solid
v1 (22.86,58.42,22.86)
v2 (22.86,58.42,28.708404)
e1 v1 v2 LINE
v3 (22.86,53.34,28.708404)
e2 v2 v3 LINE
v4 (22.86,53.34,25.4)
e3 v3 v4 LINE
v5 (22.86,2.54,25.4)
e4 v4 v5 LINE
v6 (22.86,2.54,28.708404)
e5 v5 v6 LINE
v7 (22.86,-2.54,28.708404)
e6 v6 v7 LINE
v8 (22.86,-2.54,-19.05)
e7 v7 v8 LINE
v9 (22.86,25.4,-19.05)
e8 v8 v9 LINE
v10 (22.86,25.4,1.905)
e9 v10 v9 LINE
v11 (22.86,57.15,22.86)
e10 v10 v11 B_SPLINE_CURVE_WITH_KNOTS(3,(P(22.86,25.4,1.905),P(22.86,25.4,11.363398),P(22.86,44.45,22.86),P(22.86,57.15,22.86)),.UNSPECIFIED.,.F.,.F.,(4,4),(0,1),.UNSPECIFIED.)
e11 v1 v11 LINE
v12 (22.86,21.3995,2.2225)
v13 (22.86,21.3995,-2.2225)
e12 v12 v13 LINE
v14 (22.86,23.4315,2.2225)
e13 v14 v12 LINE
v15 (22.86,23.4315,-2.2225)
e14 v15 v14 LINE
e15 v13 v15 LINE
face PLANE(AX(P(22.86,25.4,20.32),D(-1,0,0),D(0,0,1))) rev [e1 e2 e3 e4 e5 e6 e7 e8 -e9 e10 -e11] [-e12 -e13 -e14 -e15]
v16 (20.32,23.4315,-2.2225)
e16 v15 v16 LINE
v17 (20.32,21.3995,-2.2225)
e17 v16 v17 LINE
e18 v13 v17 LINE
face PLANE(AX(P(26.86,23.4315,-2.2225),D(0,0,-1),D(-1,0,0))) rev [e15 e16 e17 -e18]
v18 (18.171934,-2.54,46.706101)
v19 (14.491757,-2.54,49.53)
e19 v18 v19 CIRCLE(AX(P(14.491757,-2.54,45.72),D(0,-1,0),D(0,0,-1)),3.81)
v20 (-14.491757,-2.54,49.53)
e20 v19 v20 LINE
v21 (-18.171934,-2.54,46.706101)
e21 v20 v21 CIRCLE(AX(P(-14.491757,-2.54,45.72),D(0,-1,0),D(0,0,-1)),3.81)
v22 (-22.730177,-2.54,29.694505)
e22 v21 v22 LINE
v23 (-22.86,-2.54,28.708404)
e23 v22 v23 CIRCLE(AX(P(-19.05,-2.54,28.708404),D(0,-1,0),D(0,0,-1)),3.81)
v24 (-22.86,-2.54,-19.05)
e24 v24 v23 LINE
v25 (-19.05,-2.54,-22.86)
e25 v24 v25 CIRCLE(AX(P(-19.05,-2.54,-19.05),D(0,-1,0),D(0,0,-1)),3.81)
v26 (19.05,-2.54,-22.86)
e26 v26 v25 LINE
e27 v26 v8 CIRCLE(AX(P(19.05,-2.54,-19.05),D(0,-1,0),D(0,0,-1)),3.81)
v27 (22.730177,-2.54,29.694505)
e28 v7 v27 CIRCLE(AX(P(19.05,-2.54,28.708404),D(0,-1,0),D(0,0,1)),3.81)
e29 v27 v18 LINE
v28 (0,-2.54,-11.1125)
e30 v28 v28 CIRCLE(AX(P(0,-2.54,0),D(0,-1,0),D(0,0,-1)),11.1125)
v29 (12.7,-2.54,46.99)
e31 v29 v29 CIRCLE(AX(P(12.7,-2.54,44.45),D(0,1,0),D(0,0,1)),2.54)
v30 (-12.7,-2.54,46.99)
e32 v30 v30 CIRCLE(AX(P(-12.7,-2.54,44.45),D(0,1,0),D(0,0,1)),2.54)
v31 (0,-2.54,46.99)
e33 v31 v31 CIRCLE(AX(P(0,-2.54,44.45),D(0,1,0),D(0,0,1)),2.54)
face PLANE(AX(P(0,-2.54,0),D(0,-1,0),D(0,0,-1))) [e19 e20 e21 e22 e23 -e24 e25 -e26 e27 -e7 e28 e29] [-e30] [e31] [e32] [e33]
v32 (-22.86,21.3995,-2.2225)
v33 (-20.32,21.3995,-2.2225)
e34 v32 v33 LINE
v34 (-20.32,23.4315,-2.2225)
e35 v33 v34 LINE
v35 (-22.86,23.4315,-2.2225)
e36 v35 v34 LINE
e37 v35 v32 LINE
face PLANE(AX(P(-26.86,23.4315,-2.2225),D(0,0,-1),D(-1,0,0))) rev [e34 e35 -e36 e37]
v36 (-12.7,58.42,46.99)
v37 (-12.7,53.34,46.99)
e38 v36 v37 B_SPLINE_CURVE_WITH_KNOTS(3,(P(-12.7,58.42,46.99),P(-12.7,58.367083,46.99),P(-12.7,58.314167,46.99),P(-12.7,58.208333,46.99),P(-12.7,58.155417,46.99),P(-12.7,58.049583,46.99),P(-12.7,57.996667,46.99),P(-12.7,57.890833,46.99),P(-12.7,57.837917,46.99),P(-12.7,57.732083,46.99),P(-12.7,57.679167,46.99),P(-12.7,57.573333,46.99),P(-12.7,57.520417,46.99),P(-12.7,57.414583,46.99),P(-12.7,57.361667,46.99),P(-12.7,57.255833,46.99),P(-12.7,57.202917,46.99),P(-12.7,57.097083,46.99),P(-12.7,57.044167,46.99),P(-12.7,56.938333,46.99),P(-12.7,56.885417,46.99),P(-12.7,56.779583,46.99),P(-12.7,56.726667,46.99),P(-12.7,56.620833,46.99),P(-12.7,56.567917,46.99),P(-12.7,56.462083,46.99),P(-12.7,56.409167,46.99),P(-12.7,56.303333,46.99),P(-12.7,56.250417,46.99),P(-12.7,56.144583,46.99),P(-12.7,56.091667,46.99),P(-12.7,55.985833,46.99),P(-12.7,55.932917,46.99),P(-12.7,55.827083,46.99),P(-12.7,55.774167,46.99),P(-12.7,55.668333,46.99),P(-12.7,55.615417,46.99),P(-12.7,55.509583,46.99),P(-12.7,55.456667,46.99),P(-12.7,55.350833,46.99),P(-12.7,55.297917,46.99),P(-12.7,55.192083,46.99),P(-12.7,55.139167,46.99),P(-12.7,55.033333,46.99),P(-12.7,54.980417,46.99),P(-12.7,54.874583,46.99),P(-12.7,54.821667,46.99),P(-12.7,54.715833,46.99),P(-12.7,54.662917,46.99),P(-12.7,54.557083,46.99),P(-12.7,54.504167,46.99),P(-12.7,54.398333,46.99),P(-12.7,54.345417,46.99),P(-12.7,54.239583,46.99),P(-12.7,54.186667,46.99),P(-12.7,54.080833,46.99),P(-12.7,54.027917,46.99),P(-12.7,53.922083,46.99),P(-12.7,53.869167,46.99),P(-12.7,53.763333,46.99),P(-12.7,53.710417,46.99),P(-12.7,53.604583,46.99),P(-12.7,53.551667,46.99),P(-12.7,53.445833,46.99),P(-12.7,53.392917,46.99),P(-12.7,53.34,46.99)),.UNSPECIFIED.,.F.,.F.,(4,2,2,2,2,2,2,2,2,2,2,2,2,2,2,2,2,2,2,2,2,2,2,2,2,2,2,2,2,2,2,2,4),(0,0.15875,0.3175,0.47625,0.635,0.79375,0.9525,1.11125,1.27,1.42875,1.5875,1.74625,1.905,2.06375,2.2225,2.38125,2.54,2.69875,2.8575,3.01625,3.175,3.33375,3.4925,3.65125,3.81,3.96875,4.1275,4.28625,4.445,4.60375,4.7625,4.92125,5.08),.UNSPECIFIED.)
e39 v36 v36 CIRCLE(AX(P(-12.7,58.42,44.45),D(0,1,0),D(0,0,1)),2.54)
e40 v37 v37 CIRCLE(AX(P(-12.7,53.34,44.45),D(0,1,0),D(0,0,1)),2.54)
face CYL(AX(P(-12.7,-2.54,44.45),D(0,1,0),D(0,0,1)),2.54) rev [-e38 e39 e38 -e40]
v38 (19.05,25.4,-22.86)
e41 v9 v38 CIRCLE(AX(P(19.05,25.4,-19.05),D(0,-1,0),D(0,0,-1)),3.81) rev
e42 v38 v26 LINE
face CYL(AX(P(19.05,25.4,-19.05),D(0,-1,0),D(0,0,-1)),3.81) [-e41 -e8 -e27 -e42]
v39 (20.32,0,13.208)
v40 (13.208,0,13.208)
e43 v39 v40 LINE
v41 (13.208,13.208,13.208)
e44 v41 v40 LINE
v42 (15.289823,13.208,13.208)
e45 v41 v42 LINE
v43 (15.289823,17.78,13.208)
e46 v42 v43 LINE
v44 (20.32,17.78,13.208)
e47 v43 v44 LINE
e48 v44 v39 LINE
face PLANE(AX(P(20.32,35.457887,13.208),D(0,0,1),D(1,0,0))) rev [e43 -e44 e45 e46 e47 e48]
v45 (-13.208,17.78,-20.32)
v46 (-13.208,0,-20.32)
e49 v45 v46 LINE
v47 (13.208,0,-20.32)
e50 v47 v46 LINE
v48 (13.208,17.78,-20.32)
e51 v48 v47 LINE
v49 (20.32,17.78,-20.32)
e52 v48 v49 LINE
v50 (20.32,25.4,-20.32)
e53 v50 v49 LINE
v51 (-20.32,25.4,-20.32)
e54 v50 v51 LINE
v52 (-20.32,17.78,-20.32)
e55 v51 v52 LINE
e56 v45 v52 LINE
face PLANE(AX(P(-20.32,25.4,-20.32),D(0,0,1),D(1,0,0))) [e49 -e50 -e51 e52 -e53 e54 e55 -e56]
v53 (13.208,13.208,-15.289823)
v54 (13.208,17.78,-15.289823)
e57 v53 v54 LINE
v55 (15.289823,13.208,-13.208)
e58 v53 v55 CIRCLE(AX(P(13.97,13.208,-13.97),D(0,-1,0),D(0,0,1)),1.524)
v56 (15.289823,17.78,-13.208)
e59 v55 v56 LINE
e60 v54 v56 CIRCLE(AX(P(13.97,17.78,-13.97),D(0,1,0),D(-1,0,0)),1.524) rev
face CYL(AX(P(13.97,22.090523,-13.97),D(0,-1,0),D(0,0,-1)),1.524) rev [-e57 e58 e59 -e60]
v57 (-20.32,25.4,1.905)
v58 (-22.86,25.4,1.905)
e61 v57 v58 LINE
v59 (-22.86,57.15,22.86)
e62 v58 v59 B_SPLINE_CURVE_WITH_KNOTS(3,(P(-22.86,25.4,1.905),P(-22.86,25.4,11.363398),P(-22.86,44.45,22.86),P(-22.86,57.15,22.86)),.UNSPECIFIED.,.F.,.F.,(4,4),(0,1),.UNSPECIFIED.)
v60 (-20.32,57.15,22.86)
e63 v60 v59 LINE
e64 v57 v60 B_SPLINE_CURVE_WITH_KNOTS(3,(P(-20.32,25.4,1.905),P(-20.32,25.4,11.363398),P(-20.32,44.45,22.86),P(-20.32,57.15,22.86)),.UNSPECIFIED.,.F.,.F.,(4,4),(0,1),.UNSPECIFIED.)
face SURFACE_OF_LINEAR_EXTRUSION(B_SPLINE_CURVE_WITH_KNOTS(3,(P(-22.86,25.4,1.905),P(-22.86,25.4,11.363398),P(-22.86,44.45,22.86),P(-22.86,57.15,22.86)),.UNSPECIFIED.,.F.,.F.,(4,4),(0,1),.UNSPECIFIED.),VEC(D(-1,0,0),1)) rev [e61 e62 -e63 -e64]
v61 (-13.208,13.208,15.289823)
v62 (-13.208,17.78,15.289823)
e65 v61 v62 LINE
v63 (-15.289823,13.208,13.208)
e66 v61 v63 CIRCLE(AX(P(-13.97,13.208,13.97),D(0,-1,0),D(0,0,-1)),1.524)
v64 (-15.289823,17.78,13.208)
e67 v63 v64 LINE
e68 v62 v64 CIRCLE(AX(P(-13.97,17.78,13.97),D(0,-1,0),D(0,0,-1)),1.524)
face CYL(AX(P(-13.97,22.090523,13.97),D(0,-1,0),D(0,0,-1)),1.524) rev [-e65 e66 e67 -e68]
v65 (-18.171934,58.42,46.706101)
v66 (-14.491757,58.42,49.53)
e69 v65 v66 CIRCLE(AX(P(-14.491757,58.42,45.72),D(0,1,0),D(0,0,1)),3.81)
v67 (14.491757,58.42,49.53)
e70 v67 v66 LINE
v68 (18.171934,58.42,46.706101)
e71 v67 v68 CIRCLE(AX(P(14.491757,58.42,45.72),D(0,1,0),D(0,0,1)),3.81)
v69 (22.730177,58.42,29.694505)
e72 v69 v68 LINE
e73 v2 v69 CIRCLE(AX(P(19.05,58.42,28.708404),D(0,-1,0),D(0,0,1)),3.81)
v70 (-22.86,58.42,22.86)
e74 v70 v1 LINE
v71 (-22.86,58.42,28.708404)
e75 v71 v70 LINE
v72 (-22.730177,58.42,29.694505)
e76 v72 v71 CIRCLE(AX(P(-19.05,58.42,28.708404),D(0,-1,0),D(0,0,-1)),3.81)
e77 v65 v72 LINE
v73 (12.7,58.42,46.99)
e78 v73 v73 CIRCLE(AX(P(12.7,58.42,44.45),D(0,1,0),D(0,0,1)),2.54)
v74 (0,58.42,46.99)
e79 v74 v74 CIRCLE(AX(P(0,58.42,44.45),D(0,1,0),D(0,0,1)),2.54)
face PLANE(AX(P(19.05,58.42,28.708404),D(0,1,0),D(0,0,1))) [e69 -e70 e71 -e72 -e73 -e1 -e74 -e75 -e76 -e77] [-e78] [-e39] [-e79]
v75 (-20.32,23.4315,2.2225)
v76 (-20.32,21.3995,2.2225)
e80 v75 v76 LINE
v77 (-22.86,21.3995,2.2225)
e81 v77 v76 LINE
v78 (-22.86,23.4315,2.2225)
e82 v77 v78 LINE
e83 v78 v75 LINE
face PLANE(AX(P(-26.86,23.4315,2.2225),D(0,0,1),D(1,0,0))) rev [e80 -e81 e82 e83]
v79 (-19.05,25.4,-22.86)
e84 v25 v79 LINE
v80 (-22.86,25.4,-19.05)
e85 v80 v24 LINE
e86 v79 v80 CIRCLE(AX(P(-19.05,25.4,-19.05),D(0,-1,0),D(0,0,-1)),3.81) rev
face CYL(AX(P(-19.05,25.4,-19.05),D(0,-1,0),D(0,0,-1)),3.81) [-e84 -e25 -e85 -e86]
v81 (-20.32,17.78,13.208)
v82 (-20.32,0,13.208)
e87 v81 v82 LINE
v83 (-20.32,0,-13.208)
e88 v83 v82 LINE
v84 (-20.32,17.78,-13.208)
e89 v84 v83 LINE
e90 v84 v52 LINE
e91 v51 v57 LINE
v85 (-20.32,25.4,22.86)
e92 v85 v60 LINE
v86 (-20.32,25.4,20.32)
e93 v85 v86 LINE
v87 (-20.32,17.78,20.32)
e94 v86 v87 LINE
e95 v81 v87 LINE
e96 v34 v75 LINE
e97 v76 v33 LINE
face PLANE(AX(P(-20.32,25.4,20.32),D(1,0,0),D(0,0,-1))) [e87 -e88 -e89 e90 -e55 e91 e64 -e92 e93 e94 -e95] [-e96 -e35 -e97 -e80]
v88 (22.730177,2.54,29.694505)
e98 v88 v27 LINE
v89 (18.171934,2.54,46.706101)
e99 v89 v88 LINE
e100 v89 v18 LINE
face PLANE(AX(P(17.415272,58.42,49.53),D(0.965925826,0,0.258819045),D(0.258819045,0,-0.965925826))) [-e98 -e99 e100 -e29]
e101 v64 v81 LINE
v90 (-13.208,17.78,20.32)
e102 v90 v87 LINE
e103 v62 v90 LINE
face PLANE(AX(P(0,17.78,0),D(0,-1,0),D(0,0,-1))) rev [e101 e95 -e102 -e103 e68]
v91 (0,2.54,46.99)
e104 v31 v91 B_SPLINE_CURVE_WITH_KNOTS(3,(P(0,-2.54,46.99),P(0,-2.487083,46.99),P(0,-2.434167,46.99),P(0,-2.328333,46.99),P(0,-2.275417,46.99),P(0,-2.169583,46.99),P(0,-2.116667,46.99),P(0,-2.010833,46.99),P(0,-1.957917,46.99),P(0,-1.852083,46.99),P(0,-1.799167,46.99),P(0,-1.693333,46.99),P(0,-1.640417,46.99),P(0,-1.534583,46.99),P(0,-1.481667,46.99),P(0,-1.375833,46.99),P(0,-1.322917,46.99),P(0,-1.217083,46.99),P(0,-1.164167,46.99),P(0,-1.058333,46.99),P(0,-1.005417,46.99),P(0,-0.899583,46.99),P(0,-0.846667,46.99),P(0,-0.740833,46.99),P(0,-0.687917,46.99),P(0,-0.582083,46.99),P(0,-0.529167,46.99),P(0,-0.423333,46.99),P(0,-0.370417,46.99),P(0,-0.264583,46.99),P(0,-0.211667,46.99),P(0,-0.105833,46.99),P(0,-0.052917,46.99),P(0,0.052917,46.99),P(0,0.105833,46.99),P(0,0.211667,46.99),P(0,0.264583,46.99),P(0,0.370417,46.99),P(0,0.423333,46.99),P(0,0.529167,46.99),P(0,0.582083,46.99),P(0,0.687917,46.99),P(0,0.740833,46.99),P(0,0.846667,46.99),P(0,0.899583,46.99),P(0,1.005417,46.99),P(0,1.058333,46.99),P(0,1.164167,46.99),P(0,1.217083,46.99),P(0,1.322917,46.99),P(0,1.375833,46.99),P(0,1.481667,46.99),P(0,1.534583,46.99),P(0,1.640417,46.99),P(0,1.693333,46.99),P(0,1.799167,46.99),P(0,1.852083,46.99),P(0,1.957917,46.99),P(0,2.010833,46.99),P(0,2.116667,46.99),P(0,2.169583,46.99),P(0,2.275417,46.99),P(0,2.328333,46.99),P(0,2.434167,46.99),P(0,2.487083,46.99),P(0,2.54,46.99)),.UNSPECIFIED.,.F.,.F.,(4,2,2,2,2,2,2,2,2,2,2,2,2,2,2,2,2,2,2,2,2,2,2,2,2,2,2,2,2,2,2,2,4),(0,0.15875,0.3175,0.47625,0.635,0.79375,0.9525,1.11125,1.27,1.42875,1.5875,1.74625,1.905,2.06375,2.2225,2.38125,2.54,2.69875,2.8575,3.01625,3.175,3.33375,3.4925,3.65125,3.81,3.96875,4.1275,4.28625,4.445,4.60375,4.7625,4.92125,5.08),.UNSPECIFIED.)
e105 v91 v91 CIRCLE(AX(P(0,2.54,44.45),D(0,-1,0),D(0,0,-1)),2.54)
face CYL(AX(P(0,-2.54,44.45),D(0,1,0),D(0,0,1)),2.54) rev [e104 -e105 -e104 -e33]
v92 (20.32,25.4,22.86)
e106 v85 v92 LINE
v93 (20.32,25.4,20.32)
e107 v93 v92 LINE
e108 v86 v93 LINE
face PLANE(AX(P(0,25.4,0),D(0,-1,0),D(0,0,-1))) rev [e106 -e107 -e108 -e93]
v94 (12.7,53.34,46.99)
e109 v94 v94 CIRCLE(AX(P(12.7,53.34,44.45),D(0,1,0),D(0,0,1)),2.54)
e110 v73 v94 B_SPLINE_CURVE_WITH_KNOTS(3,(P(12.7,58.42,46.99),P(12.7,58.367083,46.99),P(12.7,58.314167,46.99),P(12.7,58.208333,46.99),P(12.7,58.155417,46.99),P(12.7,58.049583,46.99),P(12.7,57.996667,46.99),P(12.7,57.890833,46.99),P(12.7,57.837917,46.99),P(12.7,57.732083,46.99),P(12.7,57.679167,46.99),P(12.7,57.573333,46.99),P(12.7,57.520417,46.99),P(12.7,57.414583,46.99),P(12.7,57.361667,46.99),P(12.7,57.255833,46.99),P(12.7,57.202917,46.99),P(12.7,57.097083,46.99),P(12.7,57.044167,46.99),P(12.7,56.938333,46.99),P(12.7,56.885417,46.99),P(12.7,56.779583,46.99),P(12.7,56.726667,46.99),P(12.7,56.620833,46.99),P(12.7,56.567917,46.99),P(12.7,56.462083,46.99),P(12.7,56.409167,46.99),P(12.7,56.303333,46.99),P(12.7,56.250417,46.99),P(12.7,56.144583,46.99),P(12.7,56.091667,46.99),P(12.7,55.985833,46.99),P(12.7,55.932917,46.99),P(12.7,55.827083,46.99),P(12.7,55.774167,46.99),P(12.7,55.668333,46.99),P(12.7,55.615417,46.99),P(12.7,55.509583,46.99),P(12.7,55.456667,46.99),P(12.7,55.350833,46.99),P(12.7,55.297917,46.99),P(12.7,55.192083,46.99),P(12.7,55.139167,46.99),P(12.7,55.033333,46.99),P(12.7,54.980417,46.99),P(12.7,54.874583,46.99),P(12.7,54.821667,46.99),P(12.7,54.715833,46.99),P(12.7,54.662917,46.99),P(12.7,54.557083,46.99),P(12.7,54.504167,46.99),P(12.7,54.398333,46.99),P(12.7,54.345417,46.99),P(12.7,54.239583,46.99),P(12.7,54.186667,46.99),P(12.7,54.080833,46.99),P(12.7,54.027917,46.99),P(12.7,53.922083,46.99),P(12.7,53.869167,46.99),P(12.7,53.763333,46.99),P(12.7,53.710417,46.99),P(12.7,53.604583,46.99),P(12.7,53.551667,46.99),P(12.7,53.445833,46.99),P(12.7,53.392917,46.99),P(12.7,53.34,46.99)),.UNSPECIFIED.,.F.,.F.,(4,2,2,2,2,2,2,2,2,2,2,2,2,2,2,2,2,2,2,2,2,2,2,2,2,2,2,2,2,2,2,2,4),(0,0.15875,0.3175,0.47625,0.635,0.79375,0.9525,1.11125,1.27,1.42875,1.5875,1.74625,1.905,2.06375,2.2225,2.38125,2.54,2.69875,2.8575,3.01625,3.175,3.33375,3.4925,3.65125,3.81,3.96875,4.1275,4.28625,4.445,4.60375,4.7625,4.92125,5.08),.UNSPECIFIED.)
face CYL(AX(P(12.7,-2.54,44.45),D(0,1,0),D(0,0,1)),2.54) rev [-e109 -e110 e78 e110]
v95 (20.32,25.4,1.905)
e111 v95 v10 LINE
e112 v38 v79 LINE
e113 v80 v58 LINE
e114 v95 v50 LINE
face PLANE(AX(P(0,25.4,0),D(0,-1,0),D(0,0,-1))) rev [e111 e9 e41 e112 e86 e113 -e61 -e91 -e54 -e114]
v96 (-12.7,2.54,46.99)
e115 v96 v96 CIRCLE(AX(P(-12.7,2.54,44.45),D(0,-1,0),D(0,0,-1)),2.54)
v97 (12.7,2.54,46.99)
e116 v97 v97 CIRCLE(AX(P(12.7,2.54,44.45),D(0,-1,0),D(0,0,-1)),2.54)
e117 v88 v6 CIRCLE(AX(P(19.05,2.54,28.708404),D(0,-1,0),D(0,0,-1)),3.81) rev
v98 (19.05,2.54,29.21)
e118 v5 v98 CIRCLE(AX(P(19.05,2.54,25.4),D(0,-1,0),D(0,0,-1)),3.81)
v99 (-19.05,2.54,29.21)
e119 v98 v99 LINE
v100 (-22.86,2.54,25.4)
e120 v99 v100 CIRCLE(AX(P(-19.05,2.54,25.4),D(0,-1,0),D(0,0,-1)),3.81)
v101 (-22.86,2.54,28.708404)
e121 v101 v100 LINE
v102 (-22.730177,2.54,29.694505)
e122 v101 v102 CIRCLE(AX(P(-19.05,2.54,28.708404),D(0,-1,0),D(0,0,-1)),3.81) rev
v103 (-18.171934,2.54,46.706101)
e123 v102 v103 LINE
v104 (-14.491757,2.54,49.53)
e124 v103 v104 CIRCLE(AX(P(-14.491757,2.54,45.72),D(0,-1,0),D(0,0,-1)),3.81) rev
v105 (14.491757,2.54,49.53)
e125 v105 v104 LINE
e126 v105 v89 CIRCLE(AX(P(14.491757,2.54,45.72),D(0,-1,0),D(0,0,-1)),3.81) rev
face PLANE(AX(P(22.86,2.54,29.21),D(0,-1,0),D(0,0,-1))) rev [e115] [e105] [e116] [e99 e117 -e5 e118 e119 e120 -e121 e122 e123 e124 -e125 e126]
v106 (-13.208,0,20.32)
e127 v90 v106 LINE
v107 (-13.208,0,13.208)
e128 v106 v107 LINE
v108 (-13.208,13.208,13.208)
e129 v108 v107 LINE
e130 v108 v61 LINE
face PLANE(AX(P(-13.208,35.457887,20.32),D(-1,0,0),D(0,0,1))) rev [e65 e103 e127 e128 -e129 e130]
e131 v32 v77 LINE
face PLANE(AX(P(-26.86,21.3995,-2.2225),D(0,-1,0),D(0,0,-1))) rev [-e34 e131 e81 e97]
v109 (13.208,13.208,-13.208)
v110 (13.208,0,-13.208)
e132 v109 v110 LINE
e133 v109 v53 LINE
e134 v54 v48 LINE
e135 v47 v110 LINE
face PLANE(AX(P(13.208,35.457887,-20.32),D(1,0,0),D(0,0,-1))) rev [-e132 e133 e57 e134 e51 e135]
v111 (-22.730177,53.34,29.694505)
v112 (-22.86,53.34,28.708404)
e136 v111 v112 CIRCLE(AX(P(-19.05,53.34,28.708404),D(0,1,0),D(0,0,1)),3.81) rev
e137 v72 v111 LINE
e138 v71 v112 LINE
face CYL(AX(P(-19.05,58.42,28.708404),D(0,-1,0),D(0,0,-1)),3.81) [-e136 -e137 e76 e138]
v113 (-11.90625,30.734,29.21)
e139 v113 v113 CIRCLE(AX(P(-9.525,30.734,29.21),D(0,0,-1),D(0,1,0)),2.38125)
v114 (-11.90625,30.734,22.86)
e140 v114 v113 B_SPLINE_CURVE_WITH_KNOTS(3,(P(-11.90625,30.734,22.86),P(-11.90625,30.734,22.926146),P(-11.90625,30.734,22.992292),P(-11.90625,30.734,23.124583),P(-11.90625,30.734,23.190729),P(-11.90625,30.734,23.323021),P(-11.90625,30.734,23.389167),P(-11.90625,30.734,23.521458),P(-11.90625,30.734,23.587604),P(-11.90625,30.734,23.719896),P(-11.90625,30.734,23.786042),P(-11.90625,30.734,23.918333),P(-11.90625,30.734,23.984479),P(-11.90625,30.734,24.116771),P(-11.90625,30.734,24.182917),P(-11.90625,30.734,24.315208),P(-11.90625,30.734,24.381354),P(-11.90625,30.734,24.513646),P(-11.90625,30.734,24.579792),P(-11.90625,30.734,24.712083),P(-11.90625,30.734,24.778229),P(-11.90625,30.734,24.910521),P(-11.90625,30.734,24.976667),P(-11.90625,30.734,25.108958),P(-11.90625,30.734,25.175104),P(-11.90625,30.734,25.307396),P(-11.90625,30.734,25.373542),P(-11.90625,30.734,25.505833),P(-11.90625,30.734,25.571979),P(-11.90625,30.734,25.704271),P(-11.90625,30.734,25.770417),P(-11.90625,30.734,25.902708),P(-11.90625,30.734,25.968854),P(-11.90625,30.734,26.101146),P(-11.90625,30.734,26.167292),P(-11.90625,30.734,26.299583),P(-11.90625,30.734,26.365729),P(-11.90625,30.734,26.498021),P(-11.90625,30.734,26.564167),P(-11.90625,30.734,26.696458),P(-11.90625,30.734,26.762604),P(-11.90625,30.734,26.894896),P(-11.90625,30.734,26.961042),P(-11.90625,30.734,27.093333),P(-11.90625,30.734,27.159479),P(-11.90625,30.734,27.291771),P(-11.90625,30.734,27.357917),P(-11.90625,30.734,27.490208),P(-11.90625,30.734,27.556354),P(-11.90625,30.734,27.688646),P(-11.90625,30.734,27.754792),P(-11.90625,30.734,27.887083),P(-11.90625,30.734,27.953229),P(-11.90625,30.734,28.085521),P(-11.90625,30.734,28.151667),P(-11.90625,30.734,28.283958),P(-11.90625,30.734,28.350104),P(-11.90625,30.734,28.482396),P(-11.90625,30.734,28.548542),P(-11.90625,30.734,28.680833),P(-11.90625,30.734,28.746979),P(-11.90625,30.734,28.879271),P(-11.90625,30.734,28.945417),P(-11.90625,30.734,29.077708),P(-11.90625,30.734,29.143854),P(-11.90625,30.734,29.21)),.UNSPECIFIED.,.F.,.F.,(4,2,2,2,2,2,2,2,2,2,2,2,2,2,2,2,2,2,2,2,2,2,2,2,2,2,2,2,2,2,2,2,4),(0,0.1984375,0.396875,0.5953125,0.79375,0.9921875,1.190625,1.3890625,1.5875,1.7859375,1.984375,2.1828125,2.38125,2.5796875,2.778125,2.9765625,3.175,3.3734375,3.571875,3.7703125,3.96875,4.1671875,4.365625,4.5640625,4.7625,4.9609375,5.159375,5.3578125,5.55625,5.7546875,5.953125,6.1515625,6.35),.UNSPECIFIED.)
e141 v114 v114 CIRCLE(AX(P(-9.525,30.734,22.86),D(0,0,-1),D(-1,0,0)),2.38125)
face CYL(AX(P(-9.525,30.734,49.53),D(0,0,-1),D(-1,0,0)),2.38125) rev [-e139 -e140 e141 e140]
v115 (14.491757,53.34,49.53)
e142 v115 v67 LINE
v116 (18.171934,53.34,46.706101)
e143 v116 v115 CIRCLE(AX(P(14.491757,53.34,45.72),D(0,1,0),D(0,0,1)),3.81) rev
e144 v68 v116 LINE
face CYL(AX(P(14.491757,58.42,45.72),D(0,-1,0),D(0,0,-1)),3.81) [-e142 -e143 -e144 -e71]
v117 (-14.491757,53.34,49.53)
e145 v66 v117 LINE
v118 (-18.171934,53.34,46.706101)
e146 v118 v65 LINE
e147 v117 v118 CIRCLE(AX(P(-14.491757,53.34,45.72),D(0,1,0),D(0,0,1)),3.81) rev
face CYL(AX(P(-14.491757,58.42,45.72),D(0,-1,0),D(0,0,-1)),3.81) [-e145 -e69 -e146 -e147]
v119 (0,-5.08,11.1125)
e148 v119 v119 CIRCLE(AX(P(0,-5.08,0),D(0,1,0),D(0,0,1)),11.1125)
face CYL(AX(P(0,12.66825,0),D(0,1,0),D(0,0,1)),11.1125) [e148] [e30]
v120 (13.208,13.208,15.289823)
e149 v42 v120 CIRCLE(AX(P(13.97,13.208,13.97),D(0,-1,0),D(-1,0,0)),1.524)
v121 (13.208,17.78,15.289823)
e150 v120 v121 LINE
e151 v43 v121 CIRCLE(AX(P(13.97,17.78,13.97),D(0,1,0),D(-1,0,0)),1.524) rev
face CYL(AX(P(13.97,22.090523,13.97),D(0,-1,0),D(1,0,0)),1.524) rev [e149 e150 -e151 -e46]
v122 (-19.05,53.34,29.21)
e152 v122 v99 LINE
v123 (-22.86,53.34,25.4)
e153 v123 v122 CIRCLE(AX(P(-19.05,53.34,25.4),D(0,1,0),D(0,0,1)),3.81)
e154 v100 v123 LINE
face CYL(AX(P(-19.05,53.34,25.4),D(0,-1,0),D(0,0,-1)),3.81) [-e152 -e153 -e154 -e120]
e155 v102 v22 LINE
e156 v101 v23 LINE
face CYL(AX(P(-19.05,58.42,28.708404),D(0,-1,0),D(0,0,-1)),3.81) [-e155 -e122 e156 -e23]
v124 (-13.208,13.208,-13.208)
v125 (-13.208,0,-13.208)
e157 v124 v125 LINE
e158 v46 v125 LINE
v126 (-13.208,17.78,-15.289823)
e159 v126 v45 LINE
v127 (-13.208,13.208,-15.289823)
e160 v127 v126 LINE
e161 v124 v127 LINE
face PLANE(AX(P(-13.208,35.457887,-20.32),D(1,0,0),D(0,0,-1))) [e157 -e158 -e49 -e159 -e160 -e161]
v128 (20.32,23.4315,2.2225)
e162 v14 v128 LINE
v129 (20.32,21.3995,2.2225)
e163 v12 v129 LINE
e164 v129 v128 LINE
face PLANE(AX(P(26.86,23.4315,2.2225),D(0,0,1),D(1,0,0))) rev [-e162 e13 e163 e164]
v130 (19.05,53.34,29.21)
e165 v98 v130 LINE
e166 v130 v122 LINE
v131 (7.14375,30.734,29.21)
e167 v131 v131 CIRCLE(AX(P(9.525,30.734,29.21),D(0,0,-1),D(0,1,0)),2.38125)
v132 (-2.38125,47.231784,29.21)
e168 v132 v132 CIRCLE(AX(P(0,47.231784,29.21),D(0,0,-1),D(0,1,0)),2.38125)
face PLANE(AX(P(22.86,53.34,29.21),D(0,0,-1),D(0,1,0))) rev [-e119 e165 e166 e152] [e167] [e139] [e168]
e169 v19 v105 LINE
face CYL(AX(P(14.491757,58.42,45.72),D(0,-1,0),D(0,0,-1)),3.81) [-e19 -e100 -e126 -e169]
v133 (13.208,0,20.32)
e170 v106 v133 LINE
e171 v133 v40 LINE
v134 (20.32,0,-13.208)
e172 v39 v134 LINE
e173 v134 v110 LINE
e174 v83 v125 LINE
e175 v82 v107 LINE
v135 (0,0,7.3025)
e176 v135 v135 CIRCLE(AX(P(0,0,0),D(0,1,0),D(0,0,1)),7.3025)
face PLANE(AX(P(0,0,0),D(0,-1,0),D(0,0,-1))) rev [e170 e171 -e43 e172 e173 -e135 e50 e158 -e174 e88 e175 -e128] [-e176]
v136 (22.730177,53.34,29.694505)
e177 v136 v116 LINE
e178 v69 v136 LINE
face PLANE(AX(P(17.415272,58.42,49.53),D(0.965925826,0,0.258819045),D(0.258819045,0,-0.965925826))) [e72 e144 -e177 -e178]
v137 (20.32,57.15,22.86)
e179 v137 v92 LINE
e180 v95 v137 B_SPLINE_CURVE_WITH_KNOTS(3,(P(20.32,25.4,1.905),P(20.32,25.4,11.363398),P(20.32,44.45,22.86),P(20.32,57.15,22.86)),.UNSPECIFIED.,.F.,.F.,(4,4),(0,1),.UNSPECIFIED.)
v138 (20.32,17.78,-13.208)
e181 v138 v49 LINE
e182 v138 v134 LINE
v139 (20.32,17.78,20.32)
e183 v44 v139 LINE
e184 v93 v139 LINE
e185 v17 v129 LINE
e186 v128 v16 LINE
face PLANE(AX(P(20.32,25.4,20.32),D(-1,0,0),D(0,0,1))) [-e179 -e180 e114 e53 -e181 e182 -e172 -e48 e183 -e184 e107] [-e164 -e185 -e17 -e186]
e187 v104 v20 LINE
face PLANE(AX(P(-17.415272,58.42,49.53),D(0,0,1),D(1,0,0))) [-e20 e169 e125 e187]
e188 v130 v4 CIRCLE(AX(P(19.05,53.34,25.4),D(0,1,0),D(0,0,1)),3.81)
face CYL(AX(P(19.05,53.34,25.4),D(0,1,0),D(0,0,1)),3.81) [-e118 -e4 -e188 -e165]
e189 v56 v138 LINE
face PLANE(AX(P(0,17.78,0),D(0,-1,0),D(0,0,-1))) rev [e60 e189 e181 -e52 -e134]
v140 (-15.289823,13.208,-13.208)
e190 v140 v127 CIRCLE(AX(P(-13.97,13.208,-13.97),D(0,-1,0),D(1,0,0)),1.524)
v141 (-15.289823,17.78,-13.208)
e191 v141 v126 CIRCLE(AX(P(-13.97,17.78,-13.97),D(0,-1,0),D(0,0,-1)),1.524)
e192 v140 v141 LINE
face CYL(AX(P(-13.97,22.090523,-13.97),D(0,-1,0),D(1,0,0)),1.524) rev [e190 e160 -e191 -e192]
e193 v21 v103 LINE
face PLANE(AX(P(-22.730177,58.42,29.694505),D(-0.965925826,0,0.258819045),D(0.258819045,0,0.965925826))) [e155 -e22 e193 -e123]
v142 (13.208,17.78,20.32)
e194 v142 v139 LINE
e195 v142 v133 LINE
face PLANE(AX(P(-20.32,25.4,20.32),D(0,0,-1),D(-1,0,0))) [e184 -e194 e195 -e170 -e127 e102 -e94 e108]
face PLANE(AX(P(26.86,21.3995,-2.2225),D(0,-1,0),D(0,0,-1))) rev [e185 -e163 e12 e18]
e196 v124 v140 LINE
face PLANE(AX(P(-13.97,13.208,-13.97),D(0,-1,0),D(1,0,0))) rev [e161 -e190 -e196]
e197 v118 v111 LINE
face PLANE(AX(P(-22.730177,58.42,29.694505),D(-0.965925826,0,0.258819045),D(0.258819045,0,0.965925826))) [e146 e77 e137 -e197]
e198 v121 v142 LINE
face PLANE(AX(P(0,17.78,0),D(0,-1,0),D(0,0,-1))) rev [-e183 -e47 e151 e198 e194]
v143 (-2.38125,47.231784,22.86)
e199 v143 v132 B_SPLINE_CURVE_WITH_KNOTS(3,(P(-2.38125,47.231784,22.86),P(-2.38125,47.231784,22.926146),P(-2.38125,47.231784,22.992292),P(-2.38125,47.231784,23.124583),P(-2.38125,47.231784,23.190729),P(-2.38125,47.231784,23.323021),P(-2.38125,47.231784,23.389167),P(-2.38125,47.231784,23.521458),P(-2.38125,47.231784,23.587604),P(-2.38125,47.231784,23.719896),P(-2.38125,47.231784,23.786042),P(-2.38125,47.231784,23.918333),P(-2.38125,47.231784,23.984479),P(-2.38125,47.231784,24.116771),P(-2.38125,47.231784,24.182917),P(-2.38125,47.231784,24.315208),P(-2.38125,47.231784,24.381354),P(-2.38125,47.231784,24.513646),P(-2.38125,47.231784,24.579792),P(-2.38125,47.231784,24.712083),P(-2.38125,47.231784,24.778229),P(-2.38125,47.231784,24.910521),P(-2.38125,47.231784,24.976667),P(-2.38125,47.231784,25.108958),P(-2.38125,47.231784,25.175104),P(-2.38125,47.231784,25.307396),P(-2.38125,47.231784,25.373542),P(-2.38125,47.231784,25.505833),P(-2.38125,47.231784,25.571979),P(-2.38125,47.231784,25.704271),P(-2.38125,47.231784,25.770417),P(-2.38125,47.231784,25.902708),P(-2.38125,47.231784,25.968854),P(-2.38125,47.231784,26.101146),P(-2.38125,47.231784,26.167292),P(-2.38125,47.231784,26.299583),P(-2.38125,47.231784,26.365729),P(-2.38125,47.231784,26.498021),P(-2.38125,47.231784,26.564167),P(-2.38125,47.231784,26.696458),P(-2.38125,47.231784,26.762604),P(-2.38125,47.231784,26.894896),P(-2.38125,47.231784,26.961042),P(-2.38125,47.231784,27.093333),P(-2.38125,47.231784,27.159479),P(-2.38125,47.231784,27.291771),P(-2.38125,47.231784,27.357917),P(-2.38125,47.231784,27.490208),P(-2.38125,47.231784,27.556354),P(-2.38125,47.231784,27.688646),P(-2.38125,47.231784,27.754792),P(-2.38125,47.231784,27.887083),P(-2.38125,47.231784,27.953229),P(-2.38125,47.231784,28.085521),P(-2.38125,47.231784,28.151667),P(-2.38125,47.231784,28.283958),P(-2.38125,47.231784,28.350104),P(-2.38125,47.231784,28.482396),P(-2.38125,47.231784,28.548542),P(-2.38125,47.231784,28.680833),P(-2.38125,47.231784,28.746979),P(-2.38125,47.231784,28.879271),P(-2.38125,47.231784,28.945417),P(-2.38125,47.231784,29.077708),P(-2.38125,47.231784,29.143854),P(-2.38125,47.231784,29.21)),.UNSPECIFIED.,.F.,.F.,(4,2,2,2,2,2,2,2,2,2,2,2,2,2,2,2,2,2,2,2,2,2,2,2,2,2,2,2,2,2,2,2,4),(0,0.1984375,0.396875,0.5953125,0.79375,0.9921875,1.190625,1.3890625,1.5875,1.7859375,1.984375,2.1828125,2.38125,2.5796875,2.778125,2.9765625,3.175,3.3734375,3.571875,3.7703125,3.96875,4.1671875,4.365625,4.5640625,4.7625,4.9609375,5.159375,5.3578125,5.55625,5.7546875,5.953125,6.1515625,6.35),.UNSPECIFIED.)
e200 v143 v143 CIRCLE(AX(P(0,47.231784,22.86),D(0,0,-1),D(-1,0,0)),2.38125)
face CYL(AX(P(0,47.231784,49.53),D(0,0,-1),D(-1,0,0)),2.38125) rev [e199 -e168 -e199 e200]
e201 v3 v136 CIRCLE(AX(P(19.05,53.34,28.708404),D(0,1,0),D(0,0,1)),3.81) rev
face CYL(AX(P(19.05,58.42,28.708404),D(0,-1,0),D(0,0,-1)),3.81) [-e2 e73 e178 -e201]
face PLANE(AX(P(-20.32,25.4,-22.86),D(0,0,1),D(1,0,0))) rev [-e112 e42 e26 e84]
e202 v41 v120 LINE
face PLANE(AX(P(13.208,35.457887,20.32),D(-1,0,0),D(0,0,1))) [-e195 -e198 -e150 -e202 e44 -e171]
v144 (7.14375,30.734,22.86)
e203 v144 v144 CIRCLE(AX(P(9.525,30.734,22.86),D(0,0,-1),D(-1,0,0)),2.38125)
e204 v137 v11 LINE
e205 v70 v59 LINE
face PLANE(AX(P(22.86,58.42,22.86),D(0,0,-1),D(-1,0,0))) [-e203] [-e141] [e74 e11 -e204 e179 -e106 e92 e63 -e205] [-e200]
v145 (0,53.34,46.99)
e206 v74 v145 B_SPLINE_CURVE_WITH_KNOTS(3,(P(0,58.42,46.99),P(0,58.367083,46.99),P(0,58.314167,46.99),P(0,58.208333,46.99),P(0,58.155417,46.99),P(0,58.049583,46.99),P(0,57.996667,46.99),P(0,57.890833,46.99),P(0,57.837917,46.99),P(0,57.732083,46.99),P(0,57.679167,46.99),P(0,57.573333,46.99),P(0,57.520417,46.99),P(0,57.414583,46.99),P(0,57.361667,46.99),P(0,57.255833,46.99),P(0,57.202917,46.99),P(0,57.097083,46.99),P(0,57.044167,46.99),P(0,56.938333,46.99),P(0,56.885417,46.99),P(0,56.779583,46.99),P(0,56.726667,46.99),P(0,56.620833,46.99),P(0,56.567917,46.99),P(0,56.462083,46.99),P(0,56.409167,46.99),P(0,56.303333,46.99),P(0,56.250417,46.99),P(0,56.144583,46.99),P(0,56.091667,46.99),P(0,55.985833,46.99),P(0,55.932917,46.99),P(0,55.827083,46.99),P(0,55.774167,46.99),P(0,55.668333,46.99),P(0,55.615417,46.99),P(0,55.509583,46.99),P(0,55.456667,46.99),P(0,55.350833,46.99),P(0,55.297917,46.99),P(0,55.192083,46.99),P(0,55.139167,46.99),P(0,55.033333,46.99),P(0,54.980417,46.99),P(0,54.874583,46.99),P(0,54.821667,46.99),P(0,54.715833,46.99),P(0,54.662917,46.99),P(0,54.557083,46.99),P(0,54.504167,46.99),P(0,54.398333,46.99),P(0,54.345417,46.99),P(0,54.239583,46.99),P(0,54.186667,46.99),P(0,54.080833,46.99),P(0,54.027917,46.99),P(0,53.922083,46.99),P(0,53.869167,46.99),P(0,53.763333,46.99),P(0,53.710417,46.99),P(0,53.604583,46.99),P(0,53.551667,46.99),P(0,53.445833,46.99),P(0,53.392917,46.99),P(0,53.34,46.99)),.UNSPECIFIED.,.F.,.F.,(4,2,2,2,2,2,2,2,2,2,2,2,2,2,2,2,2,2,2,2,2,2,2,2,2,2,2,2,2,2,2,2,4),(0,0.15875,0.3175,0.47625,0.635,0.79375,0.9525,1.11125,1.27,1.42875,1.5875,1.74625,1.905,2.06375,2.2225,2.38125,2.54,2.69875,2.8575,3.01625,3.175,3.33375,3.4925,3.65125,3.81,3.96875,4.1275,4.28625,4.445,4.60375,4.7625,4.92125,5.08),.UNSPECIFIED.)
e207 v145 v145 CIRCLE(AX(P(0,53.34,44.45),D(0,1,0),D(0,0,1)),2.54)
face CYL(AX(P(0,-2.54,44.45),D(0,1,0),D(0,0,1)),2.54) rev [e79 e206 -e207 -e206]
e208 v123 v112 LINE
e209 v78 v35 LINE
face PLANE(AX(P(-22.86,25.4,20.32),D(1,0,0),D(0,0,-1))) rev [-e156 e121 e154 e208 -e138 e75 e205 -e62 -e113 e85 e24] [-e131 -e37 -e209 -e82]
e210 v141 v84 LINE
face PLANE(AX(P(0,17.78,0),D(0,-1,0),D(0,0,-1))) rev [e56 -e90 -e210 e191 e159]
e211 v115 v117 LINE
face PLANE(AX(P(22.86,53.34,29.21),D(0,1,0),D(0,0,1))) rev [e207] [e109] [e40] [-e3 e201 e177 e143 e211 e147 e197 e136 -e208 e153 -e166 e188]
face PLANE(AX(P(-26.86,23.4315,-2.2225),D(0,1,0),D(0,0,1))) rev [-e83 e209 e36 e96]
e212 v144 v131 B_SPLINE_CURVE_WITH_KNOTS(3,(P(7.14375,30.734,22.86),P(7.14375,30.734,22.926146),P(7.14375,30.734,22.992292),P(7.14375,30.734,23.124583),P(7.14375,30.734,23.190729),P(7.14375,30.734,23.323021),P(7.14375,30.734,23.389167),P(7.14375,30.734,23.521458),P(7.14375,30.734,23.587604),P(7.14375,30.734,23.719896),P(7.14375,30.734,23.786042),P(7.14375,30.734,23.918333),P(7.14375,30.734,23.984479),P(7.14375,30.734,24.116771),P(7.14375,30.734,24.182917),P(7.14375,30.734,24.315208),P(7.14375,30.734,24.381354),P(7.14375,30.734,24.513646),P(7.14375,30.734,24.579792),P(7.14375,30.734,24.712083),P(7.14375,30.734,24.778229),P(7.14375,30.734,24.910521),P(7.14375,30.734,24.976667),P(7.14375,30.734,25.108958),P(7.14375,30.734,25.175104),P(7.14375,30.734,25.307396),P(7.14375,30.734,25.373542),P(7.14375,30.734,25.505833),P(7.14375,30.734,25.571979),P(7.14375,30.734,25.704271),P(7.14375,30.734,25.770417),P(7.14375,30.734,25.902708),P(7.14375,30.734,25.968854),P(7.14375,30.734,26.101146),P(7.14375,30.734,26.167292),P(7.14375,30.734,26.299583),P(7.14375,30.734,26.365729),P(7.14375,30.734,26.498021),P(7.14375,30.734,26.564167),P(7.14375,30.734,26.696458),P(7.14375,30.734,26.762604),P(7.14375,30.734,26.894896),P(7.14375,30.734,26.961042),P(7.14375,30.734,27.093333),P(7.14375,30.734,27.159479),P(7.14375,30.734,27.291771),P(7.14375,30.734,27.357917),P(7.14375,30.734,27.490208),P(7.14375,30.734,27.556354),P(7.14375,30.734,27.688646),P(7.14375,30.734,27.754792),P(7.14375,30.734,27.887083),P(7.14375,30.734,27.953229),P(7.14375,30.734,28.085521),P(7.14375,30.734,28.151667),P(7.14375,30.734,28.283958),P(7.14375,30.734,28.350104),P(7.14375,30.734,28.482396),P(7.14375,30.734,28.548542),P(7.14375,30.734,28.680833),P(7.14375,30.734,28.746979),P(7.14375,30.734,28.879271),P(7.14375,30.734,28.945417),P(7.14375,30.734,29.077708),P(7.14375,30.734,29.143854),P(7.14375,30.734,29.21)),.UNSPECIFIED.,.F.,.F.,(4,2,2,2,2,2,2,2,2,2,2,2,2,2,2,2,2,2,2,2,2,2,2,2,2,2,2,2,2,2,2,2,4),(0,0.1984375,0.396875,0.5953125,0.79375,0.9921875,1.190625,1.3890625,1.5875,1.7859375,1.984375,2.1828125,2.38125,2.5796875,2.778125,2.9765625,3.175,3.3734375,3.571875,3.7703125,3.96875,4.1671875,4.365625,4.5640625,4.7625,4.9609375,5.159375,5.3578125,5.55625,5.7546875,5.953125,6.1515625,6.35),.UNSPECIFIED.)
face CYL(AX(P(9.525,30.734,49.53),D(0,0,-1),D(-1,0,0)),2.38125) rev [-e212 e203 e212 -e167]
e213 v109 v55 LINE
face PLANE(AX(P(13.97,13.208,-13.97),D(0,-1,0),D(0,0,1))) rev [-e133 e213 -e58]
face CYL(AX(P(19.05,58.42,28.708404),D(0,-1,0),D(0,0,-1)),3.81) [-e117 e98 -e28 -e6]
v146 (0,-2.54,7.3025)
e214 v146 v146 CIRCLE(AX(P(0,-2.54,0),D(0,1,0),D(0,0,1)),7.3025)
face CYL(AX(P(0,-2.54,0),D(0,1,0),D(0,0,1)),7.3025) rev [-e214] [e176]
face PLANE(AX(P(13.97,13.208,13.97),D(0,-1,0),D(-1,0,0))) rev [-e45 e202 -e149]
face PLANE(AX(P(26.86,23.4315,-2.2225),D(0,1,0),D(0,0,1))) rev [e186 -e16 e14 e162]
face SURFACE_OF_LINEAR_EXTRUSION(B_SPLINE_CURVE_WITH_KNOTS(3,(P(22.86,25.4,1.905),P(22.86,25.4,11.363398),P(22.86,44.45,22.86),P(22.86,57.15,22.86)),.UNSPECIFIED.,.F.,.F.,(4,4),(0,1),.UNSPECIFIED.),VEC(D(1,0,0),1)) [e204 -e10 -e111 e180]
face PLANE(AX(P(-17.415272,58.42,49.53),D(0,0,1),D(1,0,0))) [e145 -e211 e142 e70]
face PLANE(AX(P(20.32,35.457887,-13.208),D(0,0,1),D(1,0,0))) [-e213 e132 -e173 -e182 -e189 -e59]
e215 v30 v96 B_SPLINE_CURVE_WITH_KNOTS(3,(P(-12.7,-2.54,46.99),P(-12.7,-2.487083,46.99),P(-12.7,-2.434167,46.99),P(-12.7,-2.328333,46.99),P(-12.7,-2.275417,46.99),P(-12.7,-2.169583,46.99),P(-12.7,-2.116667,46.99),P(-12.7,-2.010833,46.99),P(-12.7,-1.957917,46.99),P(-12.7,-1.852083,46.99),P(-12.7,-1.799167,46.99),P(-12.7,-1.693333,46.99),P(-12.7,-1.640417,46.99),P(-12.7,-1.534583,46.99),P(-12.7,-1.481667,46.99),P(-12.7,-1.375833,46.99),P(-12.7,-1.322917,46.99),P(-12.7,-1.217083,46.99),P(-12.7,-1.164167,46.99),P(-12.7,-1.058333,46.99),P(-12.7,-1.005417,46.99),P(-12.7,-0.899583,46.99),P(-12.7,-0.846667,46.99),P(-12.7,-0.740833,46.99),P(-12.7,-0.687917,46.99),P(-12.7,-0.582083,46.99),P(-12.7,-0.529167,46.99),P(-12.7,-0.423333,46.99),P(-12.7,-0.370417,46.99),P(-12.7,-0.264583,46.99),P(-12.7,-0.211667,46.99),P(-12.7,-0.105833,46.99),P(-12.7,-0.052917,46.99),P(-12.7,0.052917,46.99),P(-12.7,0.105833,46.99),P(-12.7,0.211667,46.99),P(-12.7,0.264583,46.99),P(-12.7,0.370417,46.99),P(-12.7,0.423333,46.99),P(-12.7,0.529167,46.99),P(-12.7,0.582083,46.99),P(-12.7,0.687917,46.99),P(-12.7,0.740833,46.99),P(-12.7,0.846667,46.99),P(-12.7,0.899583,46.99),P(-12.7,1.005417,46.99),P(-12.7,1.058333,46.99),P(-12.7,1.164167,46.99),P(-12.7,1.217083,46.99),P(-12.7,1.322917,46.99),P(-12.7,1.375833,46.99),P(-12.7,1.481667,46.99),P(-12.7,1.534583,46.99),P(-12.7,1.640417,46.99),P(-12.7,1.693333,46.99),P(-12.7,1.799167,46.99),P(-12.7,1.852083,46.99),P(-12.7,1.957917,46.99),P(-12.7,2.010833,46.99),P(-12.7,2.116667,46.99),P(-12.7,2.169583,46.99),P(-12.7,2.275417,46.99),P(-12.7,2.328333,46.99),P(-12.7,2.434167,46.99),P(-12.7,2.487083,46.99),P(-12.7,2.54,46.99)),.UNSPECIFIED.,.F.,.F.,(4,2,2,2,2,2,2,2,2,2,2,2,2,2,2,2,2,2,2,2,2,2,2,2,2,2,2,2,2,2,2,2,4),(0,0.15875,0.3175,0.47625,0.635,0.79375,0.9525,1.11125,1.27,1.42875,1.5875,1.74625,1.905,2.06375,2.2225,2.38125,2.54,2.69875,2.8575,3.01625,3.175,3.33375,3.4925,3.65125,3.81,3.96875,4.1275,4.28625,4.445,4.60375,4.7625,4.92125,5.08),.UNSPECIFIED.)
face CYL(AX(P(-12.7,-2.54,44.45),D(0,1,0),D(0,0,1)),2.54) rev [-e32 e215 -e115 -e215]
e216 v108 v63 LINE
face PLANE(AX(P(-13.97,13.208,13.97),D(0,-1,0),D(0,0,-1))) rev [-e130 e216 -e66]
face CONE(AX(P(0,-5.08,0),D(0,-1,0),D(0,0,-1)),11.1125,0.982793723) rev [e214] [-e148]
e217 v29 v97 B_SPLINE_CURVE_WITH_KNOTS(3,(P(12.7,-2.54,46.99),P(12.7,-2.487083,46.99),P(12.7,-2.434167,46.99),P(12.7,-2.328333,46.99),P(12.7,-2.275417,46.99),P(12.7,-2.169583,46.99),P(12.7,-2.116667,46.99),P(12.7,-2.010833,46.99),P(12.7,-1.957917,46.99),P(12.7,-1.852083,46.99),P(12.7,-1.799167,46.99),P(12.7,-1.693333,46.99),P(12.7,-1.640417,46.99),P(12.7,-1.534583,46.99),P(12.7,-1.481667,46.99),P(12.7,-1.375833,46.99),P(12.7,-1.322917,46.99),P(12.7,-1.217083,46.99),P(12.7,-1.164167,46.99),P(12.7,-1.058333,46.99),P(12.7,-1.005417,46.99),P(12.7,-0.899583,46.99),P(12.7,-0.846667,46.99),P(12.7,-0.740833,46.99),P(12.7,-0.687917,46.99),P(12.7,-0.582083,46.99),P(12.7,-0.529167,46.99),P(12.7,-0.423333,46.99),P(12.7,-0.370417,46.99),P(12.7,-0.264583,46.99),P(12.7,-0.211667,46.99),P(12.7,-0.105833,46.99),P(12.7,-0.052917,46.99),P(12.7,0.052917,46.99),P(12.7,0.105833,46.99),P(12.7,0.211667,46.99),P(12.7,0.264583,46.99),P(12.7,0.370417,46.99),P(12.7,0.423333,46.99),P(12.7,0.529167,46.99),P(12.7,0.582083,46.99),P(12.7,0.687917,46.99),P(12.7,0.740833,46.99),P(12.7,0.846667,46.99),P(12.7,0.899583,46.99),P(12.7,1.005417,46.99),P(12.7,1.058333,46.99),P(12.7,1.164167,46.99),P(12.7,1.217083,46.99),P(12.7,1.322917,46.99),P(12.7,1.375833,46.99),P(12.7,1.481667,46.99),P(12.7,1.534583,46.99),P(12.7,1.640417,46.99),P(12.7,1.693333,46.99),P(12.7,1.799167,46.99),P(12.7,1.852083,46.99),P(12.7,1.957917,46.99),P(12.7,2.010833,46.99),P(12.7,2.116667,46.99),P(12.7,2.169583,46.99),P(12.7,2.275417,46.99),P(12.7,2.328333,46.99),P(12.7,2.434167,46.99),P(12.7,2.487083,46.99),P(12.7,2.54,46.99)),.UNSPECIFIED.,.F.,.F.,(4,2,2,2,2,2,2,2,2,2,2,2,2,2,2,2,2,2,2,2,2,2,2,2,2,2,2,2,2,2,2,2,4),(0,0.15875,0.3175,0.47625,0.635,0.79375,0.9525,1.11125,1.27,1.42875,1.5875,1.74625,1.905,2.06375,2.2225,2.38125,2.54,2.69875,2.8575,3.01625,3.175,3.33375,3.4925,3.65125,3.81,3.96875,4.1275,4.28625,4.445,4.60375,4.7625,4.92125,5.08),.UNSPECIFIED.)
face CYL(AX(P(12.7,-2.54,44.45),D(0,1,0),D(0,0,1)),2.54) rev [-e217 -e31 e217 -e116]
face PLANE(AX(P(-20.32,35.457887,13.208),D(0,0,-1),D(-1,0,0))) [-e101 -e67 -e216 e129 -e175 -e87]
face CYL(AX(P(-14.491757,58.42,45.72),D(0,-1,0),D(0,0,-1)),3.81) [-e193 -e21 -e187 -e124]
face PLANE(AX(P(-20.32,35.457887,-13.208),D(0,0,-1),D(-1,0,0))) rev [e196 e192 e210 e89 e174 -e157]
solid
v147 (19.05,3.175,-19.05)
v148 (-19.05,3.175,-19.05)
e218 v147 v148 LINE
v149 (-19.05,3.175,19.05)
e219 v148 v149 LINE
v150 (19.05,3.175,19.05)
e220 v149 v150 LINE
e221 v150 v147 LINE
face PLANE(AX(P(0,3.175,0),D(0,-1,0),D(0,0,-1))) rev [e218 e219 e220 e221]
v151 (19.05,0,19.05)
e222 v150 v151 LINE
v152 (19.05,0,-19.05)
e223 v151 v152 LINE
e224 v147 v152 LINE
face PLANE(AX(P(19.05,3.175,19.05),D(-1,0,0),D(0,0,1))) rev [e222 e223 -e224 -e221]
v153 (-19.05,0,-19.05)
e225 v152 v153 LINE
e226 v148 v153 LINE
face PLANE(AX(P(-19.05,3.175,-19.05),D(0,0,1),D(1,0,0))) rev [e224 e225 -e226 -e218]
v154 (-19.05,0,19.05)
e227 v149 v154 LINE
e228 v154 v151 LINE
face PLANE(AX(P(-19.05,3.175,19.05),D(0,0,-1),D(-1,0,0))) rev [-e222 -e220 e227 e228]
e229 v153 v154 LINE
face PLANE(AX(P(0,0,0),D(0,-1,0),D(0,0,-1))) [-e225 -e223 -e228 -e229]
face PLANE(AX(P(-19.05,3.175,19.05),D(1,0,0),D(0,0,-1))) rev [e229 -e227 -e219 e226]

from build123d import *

# Parameters (mm, degrees)
SKETCH1_W           = 40.64
SKETCH1_H           = 40.64
BOSS_EXTRUDE1_DEPTH = 25.4
SHELL1_T            = 2.54
SKETCH2_W           = 7.112
SKETCH2_H           = 7.112
BOSS_EXTRUDE2_DEPTH = 17.78
BOSS_EXTRUDE3_DEPTH = 60.96
SKETCH5_W           = 20.32
SKETCH5_H           = 50.8
CUT_EXTRUDE1_DEPTH  = 90.198854813
SKETCH6_R           = 2.54
CUT_EXTRUDE2_DEPTH  = 82.804169209
FILLET1_R           = 3.81
SKETCH10_R          = 1.524
CUT_EXTRUDE4_DEPTH  = 4.572
CIRPATTERN1_COUNT   = 4
SKETCH11_R          = 7.3025
CUT_EXTRUDE5_DEPTH  = 80.929324406
RIB1_START          = -2.54
RIB1_DEPTH          = 2.54
SKETCH19_R          = 2.38125
CUT_EXTRUDE6_DEPTH  = 78.625990598
SKETCH20_W          = 2.032
SKETCH20_H          = 4.445
SKETCH7_W           = 38.1
SKETCH7_H           = 38.1
BOSS_EXTRUDE4_DEPTH = 3.175


with BuildPart() as part:
    # Sketch1 → Boss-Extrude1 (new body)
    with BuildSketch(Plane(origin=(0, 0, 0), x_dir=(1, 0, 0), z_dir=(0, 1, 0))):
        Rectangle(SKETCH1_W, SKETCH1_H)
    extrude(amount=BOSS_EXTRUDE1_DEPTH)

    # Shell1
    shell1_openings = [part.faces().sort_by_distance(p)[0] for p in [
        (0, 25.4, 0),
    ]]
    offset(amount=SHELL1_T, openings=shell1_openings, kind=Kind.INTERSECTION)

    # Sketch2 → Boss-Extrude2 (add)
    with BuildSketch(Plane(origin=(0, 0, 0), x_dir=(1, 0, 0), z_dir=(0, 1, 0))):
        with Locations((-16.764, 16.764)):
            Rectangle(SKETCH2_W, SKETCH2_H)
    boss_extrude2 = extrude(amount=BOSS_EXTRUDE2_DEPTH)

    # Sketch3 → Boss-Extrude3 (add)
    with BuildSketch(Plane.XZ.offset(2.54)):
        with BuildLine():
            Line((-22.730177398, 29.694504546), (-17.41527241, 49.53))
            Line((-17.41527241, 49.53), (17.41527241, 49.53))
            Line((17.41527241, 49.53), (22.730177398, 29.694504546))
            ThreePointArc((22.730177398, 29.694504546), (22.827404922, 29.205708777), (22.86, 28.708403984))
            Line((22.86, 28.708403984), (22.86, 22.86))
            Line((22.86, 22.86), (-22.86, 22.86))
            Line((-22.86, 22.86), (-22.86, 28.708403984))
            ThreePointArc((-22.86, 28.708403984), (-22.827404922, 29.205708777), (-22.730177398, 29.694504546))
        make_face()
    extrude(amount=-BOSS_EXTRUDE3_DEPTH)

    # Sketch5 → Cut-Extrude1 (cut, through all)
    with BuildSketch(Plane.ZY.offset(22.86)):
        with Locations((39.37, 27.94)):
            Rectangle(SKETCH5_W, SKETCH5_H)
    extrude(amount=-CUT_EXTRUDE1_DEPTH, mode=Mode.SUBTRACT)

    # Sketch6 → Cut-Extrude2 (cut, through all)
    with BuildSketch(Plane(origin=(0, 58.42, 0), x_dir=(1, 0, 0), z_dir=(0, 1, 0))):
        with Locations(Location((-12.7, -44.45, 0), (0, 0, 270))):
            Circle(SKETCH6_R)
        with Locations(Location((0, -44.45, 0), (0, 0, 270))):
            Circle(SKETCH6_R)
        with Locations(Location((12.7, -44.45, 0), (0, 0, 270))):
            Circle(SKETCH6_R)
    extrude(amount=-CUT_EXTRUDE2_DEPTH, mode=Mode.SUBTRACT)

    # Fillet1
    # the kernel refuses this fillet: 3.81 mm, written as the material it takes off along each edge
    with BuildSketch(Plane(origin=(-17.41527241, 46.03121044, 49.53), x_dir=(-0.25881904510252424, 0, -0.9659258262890673), z_dir=(0, 1, 0)), Plane(origin=(17.41527241, 46.03121044, 49.53), x_dir=(-1, 0, 0), z_dir=(0, 1, 0)), Plane(origin=(-17.41527241, -9.84878956, 49.53), x_dir=(-0.25881904510252424, 0, -0.9659258262890673), z_dir=(0, 1, 0)), Plane(origin=(17.41527241, -9.84878956, 49.53), x_dir=(-1, 0, 0), z_dir=(0, 1, 0))) as fillet1_piece_1:
        with BuildLine():
            CenterArc((FILLET1_R * 0.767326987979, -FILLET1_R), FILLET1_R, 90, 75)
            Line((-FILLET1_R * 0.19859883831, -FILLET1_R * 0.741180954897), (0, 0))
            Line((0, 0), (FILLET1_R * 0.767326987979, 0))
        make_face()
    extrude(amount=19.697579121, mode=Mode.SUBTRACT)
    with BuildSketch(Plane(origin=(-22.826837491, 53.34, 29.21), x_dir=(-0.008703740786851863, 0, -0.999962121730776), z_dir=(0, -1, 0))) as fillet1_piece_2:
        with BuildLine():
            CenterArc((3.776983069, 3.809855684), FILLET1_R, 180.49869391, 90)
            Line((-0.032872615, 3.776694431), (-0.413858183, 3.773378306))
            Line((-0.413858183, 3.773378306), (-0.380985568, -0.003316125))
            Line((-0.380985568, -0.003316125), (-0.04687044, -0.378106019))
            ThreePointArc((-0.04687044, -0.378106019), (0.505181779, -0.409781059), (3.813460447, -0.380985568))
            Line((3.813460447, -0.380985568), (3.810144322, 0))
        make_face()
    extrude(amount=50.8, mode=Mode.SUBTRACT)
    with BuildSketch(Plane(origin=(22.826837491, 53.34, 29.21), x_dir=(0.008703740786853719, 0, -0.999962121730776), z_dir=(0, -1, 0))) as fillet1_piece_3:
        with BuildLine():
            CenterArc((3.776983069, -3.809855684), FILLET1_R, 89.50130609, 90)
            Line((-0.032872615, -3.776694431), (-0.413858183, -3.773378306))
            Line((-0.413858183, -3.773378306), (-0.380985568, 0.003316125))
            Line((-0.380985568, 0.003316125), (-0.04687044, 0.378106019))
            ThreePointArc((-0.04687044, 0.378106019), (0.505181779, 0.409781059), (3.813460447, 0.380985568))
            Line((3.813460447, 0.380985568), (3.810144322, 0))
        make_face()
    extrude(amount=50.8, mode=Mode.SUBTRACT)
    with BuildSketch(Plane(origin=(-22.86, -12.065, -22.86), x_dir=(1, 0, 0), z_dir=(0, 1, 0))) as fillet1_piece_4:
        with BuildLine():
            CenterArc((FILLET1_R, -FILLET1_R), FILLET1_R, 90, 90)
            Line((0, -FILLET1_R), (0, 0))
            Line((0, 0), (FILLET1_R, 0))
        make_face()
    extrude(amount=46.99, mode=Mode.SUBTRACT)
    with BuildSketch(Plane(origin=(22.86, -12.065, -22.86), x_dir=(-1, 0, 0), z_dir=(0, 1, 0))) as fillet1_piece_5:
        with BuildLine():
            CenterArc((FILLET1_R, FILLET1_R), FILLET1_R, 180, 90)
            Line((0, FILLET1_R), (0, 0))
            Line((0, 0), (FILLET1_R, 0))
        make_face()
    extrude(amount=46.99, mode=Mode.SUBTRACT)

    # Sketch10 → Cut-Extrude4 (cut)
    with BuildSketch(Plane.XZ.offset(-13.208)):
        with Locations((-13.97, -13.97)):
            Circle(SKETCH10_R)
    cut_extrude4 = extrude(amount=-CUT_EXTRUDE4_DEPTH, mode=Mode.SUBTRACT)

    # CirPattern1: Boss-Extrude2, Cut-Extrude4 ×4 about axis
    cirpattern1_axis = Axis((0, 0, 0), (0, 1, 0))
    add([boss_extrude2.rotate(cirpattern1_axis, i * 360 / CIRPATTERN1_COUNT) for i in range(1, CIRPATTERN1_COUNT)])
    add([cut_extrude4.rotate(cirpattern1_axis, i * 360 / CIRPATTERN1_COUNT) for i in range(1, CIRPATTERN1_COUNT)], mode=Mode.SUBTRACT)

    # Sketch11 → Cut-Extrude5 (cut, through all)
    with BuildSketch(Plane(origin=(0, 0, 0), x_dir=(1, 0, 0), z_dir=(0, 1, 0))):
        with Locations(Location((0, 0, 0), (0, 0, 270))):
            Circle(SKETCH11_R)
    extrude(amount=-CUT_EXTRUDE5_DEPTH, mode=Mode.SUBTRACT)

    # Sketch12 → Revolve1 (revolve)
    with BuildSketch(Plane.XY, mode=Mode.PRIVATE) as revolve1_sk:
        Polygon((-11.1125, -2.54), (-11.1125, -5.08), (-7.3025, -2.54), align=None)
    revolve(revolve1_sk.sketch.rotate(Axis((0, 12.66825, 0), (0, -1, 0)), 270), axis=Axis((0, 12.66825, 0), (0, -1, 0)))

    # Rib1: read off the stored shape, not the designer's step
    # Rib1 outline → Rib1 (add)
    with BuildSketch(Plane.ZY.offset(22.86).offset(RIB1_START)):
        with BuildLine():
            add(Edge.make_bspline(
                [(1.905, 25.4), (11.363397975, 25.4), (22.86, 44.45), (22.86, 57.15)],
                knots=[0, 0, 0, 0, 1, 1, 1, 1], degree=3))
            Line((1.905, 25.4), (22.86, 25.4))
            Line((22.86, 25.4), (22.86, 57.15))
        make_face()
    rib1 = extrude(amount=RIB1_DEPTH)

    # Mirror2: Rib1 across plane
    add(rib1.mirror(Plane(origin=(0, 0, 0), x_dir=(0, 0, 1), z_dir=(1, 0, 0))))

    # Sketch19 → Cut-Extrude6 (cut, through all)
    with BuildSketch(Plane(origin=(0, 0, 22.86), x_dir=(-1, 0, 0), z_dir=(0, 0, -1))):
        with Locations((-9.525, 30.734)):
            Circle(SKETCH19_R)
        with Locations((9.525, 30.734)):
            Circle(SKETCH19_R)
        with Locations((0, 47.231783942)):
            Circle(SKETCH19_R)
    extrude(amount=-CUT_EXTRUDE6_DEPTH, mode=Mode.SUBTRACT)

    # Cut-Sweep1: sweep along a path in Sketch21
    with BuildLine() as cut_sweep1_path:  # in the path sketch's own coordinates; laid on its plane below (add() does not lay a ready-made edge on the line's plane)
        Line((-22.86, 22.4155), (-19.05, 22.4155))
        add(Edge.make_bspline(
            [(-19.05, 22.4155), (-16.933333333, 22.4155), (-15.24, 23.791333333), (-15.24, 25.273)],
            knots=[0, 0, 0, 0, 1, 1, 1, 1], degree=3))
    # Sketch20 → Cut-Sweep1 (sweep, cut)
    with BuildSketch(Plane(origin=(0, 25.273, 0), x_dir=(1, 0, 0), z_dir=(0, 1, 0))):
        with Locations((-15.24, 0)):
            Rectangle(SKETCH20_W, SKETCH20_H)
    cut_sweep1 = sweep(path=Plane.XY * cut_sweep1_path.line, mode=Mode.SUBTRACT)

    # Mirror4: Cut-Sweep1 across plane
    add(cut_sweep1.mirror(Plane(origin=(0, 0, 0), x_dir=(0, 0, 1), z_dir=(1, 0, 0))), mode=Mode.SUBTRACT)


with BuildPart() as body_2:
    # Sketch7 → Boss-Extrude4 (new body)
    with BuildSketch(Plane(origin=(0, 0, 0), x_dir=(1, 0, 0), z_dir=(0, 1, 0))):
        Rectangle(SKETCH7_W, SKETCH7_H)
    extrude(amount=BOSS_EXTRUDE4_DEPTH)


solid = Compound([part.part, body_2.part])
